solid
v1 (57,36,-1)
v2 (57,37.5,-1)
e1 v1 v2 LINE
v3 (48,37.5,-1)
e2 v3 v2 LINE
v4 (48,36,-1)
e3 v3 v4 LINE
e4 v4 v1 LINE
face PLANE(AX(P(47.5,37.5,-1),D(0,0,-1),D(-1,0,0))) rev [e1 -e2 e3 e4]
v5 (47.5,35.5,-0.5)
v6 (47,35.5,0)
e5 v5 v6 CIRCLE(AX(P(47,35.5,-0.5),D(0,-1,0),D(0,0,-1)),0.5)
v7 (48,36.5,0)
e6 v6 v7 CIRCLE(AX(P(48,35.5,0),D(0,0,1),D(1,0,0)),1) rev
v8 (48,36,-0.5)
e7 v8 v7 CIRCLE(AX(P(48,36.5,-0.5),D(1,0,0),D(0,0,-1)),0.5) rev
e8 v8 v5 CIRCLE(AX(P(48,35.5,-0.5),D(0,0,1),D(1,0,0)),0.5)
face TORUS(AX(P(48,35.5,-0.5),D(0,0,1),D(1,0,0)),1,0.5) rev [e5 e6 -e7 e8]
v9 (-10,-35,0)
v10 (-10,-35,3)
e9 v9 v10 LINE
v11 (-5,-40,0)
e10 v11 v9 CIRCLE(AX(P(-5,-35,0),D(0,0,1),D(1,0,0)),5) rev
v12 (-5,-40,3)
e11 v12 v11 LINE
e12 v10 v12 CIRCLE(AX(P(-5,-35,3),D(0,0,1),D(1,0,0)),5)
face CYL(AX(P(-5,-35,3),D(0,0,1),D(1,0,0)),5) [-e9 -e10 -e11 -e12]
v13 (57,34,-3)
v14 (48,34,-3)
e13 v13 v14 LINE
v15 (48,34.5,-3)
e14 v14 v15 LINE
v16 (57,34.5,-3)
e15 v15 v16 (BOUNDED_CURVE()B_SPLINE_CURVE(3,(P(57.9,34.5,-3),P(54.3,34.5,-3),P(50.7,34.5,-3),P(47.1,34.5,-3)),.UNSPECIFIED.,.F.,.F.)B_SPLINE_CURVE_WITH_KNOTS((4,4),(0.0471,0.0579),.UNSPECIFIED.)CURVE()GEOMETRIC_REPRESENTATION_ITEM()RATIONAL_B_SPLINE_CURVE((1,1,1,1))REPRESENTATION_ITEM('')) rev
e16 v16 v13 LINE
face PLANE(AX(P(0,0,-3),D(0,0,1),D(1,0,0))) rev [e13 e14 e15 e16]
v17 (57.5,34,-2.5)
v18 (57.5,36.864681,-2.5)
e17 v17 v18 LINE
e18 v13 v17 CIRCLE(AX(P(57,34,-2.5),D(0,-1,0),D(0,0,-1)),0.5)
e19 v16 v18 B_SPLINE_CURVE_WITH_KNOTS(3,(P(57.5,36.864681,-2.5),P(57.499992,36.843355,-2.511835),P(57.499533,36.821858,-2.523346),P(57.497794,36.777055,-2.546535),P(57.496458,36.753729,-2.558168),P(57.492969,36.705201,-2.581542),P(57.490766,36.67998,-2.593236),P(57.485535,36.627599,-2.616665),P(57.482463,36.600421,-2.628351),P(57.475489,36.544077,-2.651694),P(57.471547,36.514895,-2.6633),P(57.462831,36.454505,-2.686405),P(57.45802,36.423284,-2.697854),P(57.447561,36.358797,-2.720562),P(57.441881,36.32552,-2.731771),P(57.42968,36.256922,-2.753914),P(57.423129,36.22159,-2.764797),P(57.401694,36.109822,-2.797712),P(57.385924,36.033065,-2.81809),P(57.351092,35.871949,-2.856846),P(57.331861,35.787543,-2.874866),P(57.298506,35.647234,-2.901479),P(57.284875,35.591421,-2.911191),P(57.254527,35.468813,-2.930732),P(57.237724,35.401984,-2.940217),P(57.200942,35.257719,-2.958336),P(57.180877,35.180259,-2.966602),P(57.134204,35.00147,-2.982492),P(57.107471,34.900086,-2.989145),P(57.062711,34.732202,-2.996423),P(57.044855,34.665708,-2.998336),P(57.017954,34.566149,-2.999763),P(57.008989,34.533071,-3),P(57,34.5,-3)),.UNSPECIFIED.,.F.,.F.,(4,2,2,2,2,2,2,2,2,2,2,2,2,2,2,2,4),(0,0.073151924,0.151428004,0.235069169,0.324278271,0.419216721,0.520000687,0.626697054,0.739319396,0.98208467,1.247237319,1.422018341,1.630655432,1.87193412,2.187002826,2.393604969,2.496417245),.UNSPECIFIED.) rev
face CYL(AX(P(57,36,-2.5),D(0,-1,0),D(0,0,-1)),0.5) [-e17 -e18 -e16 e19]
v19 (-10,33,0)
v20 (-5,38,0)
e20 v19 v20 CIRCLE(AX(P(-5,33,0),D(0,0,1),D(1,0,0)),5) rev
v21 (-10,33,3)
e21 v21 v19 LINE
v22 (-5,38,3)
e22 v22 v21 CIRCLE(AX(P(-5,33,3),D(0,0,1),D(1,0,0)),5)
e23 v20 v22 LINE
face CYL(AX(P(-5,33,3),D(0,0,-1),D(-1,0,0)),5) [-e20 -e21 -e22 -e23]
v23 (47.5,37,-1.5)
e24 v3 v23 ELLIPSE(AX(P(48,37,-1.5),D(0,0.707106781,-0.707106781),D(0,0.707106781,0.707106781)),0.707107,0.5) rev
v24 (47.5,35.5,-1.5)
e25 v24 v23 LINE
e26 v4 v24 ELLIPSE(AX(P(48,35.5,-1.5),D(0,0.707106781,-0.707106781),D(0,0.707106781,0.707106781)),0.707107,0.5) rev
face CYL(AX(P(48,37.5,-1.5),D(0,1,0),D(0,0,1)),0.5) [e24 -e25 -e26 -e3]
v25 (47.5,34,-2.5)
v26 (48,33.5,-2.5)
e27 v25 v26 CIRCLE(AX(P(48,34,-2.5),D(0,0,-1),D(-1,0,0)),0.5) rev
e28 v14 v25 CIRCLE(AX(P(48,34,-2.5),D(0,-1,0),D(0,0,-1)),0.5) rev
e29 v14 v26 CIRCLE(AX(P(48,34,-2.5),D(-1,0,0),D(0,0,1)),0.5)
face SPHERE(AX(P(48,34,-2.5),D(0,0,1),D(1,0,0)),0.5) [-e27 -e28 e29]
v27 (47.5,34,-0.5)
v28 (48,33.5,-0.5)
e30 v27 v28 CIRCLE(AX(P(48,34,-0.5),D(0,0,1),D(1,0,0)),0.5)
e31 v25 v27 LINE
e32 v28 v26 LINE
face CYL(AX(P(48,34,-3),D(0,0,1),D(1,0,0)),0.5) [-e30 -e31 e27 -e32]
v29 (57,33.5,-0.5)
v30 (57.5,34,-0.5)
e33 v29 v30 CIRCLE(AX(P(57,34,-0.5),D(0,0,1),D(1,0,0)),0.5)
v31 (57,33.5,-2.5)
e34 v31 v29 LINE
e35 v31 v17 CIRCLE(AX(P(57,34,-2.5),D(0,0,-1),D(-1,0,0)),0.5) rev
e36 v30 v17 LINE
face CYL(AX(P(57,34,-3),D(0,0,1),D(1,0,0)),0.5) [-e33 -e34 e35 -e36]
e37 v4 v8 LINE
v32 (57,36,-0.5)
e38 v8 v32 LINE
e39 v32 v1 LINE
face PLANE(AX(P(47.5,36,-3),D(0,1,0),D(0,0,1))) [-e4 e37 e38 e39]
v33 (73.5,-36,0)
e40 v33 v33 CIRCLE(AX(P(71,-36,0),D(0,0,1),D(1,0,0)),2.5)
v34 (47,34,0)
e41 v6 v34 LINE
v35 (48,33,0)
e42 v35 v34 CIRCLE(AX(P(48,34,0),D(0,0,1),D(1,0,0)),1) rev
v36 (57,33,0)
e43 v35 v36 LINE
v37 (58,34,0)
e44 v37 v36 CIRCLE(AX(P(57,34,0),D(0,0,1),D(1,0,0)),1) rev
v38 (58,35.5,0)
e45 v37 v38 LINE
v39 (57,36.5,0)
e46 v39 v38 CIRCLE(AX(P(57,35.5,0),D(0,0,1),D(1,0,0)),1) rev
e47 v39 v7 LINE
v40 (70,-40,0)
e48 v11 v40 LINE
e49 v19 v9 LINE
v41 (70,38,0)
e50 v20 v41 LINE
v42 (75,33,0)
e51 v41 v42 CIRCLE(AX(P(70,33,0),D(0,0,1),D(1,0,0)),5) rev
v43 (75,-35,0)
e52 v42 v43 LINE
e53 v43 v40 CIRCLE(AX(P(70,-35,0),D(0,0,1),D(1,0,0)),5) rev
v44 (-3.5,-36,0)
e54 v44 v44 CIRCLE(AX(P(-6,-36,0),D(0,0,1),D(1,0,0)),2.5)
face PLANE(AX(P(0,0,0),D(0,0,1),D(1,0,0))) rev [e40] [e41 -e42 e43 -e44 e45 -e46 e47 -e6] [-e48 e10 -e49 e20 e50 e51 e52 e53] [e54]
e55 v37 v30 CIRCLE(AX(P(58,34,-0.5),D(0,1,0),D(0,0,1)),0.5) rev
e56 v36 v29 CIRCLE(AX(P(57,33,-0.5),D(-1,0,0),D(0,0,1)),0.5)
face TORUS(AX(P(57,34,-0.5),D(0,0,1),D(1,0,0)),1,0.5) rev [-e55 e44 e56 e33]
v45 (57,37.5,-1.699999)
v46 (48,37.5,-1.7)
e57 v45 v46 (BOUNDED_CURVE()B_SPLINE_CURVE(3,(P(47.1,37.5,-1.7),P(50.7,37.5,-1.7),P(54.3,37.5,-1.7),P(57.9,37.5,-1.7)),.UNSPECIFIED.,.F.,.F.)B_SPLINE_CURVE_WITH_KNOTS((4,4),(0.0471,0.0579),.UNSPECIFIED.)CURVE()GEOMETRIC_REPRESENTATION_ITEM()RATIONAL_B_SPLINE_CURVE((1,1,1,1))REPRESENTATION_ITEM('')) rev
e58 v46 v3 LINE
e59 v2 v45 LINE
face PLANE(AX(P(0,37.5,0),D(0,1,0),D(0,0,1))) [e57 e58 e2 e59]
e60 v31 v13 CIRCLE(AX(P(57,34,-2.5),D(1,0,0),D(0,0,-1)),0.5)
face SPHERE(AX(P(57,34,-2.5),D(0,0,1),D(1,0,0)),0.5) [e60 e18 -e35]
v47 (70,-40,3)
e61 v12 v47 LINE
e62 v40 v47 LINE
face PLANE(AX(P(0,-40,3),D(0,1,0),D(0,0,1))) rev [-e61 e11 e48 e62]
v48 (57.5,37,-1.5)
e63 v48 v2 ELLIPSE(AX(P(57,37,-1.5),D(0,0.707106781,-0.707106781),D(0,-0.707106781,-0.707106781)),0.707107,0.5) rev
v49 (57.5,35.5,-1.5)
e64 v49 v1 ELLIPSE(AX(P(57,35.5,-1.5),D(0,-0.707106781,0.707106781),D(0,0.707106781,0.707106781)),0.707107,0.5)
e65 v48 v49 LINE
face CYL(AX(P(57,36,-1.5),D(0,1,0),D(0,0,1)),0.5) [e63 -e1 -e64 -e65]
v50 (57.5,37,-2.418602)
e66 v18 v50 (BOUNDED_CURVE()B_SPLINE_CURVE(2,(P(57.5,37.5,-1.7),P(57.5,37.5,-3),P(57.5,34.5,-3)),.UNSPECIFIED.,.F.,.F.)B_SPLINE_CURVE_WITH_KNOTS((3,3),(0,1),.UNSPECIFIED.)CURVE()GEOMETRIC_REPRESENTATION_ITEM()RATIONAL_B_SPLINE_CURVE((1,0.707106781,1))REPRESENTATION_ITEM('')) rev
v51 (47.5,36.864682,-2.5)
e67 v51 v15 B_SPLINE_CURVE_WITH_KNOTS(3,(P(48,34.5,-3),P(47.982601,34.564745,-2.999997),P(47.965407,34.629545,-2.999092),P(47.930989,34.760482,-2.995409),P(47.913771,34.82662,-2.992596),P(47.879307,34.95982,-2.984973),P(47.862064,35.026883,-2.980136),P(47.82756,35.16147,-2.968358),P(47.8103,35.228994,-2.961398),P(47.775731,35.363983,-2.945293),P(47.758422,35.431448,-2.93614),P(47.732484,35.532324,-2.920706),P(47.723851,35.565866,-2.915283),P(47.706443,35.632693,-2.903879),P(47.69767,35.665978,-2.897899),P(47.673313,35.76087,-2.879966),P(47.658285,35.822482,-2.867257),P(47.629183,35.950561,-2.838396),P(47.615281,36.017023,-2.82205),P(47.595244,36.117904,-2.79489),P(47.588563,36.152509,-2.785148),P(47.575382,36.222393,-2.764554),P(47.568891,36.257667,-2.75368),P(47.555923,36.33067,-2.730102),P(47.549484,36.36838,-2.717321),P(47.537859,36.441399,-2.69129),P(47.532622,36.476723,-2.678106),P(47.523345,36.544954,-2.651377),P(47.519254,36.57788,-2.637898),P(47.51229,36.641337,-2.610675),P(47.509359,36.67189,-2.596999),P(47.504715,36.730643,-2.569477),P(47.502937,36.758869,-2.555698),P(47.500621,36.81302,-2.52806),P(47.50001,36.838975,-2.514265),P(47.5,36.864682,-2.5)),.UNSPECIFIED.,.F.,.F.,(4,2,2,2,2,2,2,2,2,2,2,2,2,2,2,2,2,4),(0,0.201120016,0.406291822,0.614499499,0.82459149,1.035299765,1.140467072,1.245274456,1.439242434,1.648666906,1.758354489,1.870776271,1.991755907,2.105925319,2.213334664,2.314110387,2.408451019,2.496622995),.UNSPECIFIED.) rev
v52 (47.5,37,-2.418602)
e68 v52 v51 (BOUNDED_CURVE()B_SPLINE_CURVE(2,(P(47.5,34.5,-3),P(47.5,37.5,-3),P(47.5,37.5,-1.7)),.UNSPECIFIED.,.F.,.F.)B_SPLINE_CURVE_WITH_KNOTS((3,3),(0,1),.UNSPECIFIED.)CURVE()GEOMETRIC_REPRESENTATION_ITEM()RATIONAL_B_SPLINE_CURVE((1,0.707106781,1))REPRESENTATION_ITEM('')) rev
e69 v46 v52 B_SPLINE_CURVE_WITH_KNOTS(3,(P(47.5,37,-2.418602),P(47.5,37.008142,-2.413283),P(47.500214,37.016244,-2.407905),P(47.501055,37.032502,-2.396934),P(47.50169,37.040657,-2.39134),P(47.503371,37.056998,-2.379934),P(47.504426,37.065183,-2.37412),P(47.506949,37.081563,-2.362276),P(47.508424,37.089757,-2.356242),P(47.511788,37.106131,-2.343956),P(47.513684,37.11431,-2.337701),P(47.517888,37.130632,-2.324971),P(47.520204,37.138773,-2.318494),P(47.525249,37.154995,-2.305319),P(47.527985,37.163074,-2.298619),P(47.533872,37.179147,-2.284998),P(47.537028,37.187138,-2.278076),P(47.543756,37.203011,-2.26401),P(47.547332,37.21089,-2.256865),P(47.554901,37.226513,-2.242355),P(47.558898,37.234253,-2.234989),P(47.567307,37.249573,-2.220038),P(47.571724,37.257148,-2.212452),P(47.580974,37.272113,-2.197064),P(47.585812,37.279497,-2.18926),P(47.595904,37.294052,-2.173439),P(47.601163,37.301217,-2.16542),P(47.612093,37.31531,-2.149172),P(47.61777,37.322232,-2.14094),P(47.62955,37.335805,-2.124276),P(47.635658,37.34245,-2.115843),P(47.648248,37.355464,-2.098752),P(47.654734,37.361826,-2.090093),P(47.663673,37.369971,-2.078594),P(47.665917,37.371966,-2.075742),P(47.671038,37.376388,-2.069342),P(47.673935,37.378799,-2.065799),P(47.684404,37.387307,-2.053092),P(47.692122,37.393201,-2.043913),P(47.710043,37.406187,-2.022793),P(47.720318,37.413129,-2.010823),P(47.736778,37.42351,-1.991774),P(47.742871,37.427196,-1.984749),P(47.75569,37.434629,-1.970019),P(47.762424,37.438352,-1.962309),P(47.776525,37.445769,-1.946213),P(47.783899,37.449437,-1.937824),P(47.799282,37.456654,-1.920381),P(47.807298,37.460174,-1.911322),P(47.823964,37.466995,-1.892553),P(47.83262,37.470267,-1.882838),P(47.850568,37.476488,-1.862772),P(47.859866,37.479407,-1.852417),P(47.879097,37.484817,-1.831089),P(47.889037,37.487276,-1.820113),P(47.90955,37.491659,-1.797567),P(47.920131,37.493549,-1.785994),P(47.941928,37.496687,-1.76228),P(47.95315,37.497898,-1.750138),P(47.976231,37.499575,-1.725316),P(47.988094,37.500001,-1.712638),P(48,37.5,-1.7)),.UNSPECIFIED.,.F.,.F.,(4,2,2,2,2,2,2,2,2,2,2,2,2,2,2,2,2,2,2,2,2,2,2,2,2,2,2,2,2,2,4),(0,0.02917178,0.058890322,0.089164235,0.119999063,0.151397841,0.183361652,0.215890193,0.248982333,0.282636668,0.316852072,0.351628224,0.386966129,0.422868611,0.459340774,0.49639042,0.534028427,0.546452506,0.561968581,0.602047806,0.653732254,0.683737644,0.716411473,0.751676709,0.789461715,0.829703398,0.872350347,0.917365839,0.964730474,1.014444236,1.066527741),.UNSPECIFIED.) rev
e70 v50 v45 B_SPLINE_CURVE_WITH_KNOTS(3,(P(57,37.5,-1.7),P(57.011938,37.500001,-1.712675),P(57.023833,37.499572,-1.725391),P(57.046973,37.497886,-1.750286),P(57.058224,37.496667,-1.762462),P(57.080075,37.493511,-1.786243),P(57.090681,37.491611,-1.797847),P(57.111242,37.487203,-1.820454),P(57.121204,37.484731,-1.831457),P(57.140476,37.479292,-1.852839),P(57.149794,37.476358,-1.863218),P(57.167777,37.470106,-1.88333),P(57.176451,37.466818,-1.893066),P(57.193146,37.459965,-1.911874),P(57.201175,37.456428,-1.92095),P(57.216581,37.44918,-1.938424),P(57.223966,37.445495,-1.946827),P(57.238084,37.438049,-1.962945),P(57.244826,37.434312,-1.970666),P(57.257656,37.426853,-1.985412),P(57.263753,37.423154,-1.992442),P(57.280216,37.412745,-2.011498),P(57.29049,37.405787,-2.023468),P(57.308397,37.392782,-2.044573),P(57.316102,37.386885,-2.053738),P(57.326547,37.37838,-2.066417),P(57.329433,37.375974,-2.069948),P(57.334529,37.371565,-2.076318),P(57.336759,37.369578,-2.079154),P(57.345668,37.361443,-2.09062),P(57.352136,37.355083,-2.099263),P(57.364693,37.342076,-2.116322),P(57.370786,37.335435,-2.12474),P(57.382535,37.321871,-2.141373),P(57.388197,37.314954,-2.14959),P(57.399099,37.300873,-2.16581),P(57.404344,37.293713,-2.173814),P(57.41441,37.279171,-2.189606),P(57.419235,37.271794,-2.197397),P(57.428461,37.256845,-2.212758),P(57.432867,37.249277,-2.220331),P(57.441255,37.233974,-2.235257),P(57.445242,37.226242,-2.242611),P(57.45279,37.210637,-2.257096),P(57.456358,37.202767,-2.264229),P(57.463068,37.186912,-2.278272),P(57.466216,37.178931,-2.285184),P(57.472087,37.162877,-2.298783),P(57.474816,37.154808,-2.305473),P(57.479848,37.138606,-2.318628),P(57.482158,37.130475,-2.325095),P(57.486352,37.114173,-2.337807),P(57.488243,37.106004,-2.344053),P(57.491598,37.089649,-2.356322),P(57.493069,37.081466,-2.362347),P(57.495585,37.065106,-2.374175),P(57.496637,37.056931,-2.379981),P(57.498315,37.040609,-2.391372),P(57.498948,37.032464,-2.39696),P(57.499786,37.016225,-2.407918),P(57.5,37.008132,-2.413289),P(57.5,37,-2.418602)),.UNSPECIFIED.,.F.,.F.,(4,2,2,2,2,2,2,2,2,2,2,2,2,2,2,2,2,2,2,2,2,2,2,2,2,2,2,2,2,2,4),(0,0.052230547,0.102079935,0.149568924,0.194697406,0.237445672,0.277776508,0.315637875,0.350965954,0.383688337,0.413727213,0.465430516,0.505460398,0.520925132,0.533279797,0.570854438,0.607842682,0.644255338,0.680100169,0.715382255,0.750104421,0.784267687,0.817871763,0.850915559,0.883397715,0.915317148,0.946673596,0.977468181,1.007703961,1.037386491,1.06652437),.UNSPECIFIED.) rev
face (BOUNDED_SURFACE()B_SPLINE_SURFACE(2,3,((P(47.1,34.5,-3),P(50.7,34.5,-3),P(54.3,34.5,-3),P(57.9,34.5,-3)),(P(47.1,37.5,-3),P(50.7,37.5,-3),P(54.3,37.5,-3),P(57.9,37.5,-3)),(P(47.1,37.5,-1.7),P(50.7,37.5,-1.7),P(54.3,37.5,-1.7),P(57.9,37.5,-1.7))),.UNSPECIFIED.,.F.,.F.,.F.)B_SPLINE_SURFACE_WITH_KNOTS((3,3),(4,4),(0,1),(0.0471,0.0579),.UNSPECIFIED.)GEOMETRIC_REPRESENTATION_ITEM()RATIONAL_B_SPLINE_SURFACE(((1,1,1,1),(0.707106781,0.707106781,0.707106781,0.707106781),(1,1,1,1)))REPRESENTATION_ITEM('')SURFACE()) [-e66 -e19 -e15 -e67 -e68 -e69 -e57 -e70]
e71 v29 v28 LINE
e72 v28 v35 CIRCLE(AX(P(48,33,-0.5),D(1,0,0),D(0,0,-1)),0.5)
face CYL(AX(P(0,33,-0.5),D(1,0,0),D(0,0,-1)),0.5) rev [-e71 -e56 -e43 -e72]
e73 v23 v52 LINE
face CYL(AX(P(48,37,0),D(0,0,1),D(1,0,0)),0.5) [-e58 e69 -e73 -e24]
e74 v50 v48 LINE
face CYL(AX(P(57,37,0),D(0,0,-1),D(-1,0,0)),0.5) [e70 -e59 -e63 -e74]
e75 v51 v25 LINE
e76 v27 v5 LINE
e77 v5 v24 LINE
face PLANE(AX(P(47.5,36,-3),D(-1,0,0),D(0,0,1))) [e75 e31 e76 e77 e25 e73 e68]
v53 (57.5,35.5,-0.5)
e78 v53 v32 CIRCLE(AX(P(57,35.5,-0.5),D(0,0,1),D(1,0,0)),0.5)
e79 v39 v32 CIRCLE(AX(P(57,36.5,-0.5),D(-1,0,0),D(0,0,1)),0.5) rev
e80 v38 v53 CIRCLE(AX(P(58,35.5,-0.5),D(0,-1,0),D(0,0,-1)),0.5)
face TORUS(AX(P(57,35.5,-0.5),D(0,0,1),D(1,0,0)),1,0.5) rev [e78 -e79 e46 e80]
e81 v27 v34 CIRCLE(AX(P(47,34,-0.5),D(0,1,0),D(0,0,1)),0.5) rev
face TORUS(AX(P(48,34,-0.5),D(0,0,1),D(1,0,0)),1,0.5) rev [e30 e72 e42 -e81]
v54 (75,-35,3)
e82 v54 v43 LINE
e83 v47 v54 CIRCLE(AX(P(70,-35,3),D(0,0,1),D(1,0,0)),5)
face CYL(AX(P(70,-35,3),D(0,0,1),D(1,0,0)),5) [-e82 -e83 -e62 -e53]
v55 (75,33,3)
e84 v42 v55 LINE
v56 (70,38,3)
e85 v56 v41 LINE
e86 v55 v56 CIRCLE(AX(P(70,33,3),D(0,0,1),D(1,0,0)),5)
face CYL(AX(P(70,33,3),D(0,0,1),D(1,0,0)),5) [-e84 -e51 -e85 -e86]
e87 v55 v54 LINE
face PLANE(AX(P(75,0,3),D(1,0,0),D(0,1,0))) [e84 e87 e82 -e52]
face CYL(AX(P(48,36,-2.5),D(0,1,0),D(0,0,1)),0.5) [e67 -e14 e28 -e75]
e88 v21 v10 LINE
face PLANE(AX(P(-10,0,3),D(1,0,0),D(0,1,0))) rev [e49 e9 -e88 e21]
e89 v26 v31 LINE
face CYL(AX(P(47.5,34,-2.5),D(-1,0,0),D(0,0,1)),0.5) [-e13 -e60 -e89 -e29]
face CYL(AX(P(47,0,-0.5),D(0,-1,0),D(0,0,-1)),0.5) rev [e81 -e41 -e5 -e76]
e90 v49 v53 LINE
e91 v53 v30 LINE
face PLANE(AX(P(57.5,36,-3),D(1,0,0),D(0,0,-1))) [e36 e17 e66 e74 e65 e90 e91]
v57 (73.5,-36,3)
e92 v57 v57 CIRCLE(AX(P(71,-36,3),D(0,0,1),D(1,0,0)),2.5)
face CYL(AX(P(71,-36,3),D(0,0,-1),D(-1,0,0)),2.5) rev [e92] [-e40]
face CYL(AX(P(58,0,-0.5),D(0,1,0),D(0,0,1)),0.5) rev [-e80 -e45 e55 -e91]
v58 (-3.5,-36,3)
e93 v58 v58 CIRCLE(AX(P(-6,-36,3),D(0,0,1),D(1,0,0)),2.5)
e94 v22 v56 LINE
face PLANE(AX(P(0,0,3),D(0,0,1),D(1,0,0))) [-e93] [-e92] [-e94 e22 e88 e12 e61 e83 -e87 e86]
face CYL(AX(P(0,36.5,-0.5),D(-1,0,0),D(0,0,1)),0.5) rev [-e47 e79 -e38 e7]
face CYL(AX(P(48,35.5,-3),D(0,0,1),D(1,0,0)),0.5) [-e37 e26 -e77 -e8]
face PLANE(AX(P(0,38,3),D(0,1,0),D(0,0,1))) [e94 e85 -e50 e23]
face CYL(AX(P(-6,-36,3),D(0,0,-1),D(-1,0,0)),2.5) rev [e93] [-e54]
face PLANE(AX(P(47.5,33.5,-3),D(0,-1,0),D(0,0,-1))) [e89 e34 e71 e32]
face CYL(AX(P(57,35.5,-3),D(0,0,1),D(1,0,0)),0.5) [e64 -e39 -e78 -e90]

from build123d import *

# Parameters (mm, degrees)
SKETCH2_W           = 85
SKETCH2_H           = 78
BOSS_EXTRUDE2_DEPTH = 3
SKETCH5_R           = 2.5
CUT_EXTRUDE1_DEPTH  = 3
FILLET1_R           = 5
FILLET2_R           = 5
FILLET3_R           = 5
FILLET4_R           = 5
SKETCH12_W          = 10
SKETCH12_H          = 2.5
BOSS_EXTRUDE3_DEPTH = 3
SKETCH14_W          = 10
SKETCH14_H          = 2
BOSS_EXTRUDE4_DEPTH = 1.5
FILLET10_R          = 0.5
FILLET11_START      = 47
FILLET11_DEPTH      = 11


with BuildPart() as part:
    # Sketch2 → Boss-Extrude2 (new body)
    with BuildSketch(Plane.XY):
        with Locations((32.5, -1)):
            Rectangle(SKETCH2_W, SKETCH2_H)
    extrude(amount=BOSS_EXTRUDE2_DEPTH)

    # Sketch5 → Cut-Extrude1 (cut)
    with BuildSketch(Plane.XY):
        with Locations((-6, -36)):
            Circle(SKETCH5_R)
        with Locations((71, -36)):
            Circle(SKETCH5_R)
    extrude(amount=CUT_EXTRUDE1_DEPTH, mode=Mode.SUBTRACT)

    # Fillet1
    fillet1_edges = [part.edges().sort_by_distance(p)[0] for p in [
        (75, -40, 1.5),
    ]]
    fillet(fillet1_edges, radius=FILLET1_R)

    # Fillet2
    fillet2_edges = [part.edges().sort_by_distance(p)[0] for p in [
        (75, 38, 1.5),
    ]]
    fillet(fillet2_edges, radius=FILLET2_R)

    # Fillet3
    fillet3_edges = [part.edges().sort_by_distance(p)[0] for p in [
        (-10, 38, 1.5),
    ]]
    fillet(fillet3_edges, radius=FILLET3_R)

    # Fillet4
    fillet4_edges = [part.edges().sort_by_distance(p)[0] for p in [
        (-10, -40, 1.5),
    ]]
    fillet(fillet4_edges, radius=FILLET4_R)

    # Sketch12 → Boss-Extrude3 (add)
    with BuildSketch(Plane.XY):
        with Locations((52.5, 34.75)):
            Rectangle(SKETCH12_W, SKETCH12_H)
    extrude(amount=-BOSS_EXTRUDE3_DEPTH)

    # Sketch14 → Boss-Extrude4 (add)
    with BuildSketch(Plane(origin=(0, 36, 0), x_dir=(1, 0, 0), z_dir=(0, 1, 0))):
        with Locations((52.5, 2)):
            Rectangle(SKETCH14_W, SKETCH14_H)
    extrude(amount=BOSS_EXTRUDE4_DEPTH)

    # Fillet10
    fillet10_edges = [part.edges().sort_by_distance(p)[0] for p in [
        (57.5, 35.5, -3),
        (52.5, 33.5, -3),
        (57.5, 33.5, -1.5),
        (47.5, 35.5, -3),
        (47.5, 33.5, -1.5),
        (57.5, 34.75, 0),
        (52.5, 36, 0),
        (47.5, 34.75, 0),
        (52.5, 33.5, 0),
        (57.5, 36, -0.5),
        (47.5, 36, -0.5),
        (47.5, 36.75, -1),
        (57.5, 36.75, -1),
        (47.5, 37.5, -2),
        (57.5, 37.5, -2),
    ]]
    fillet(fillet10_edges, radius=FILLET10_R)

    # Fillet11: read off the stored shape, not the designer's step
    # Fillet11 outline → Fillet11 (cut)
    with BuildSketch(Plane.YZ.offset(FILLET11_START)):
        with BuildLine():
            add(Edge.make_bspline(
                [(34.5, -3), (37.5, -3), (37.5, -1.7)],
                knots=[0, 0, 0, 1, 1, 1], degree=2, weights=[1, 0.707106781, 1]))
            Line((34.5, -3), (37.5, -3))
            Line((37.5, -3), (37.5, -1.7))
        make_face()
    extrude(amount=FILLET11_DEPTH, mode=Mode.SUBTRACT)


solid = part.part
